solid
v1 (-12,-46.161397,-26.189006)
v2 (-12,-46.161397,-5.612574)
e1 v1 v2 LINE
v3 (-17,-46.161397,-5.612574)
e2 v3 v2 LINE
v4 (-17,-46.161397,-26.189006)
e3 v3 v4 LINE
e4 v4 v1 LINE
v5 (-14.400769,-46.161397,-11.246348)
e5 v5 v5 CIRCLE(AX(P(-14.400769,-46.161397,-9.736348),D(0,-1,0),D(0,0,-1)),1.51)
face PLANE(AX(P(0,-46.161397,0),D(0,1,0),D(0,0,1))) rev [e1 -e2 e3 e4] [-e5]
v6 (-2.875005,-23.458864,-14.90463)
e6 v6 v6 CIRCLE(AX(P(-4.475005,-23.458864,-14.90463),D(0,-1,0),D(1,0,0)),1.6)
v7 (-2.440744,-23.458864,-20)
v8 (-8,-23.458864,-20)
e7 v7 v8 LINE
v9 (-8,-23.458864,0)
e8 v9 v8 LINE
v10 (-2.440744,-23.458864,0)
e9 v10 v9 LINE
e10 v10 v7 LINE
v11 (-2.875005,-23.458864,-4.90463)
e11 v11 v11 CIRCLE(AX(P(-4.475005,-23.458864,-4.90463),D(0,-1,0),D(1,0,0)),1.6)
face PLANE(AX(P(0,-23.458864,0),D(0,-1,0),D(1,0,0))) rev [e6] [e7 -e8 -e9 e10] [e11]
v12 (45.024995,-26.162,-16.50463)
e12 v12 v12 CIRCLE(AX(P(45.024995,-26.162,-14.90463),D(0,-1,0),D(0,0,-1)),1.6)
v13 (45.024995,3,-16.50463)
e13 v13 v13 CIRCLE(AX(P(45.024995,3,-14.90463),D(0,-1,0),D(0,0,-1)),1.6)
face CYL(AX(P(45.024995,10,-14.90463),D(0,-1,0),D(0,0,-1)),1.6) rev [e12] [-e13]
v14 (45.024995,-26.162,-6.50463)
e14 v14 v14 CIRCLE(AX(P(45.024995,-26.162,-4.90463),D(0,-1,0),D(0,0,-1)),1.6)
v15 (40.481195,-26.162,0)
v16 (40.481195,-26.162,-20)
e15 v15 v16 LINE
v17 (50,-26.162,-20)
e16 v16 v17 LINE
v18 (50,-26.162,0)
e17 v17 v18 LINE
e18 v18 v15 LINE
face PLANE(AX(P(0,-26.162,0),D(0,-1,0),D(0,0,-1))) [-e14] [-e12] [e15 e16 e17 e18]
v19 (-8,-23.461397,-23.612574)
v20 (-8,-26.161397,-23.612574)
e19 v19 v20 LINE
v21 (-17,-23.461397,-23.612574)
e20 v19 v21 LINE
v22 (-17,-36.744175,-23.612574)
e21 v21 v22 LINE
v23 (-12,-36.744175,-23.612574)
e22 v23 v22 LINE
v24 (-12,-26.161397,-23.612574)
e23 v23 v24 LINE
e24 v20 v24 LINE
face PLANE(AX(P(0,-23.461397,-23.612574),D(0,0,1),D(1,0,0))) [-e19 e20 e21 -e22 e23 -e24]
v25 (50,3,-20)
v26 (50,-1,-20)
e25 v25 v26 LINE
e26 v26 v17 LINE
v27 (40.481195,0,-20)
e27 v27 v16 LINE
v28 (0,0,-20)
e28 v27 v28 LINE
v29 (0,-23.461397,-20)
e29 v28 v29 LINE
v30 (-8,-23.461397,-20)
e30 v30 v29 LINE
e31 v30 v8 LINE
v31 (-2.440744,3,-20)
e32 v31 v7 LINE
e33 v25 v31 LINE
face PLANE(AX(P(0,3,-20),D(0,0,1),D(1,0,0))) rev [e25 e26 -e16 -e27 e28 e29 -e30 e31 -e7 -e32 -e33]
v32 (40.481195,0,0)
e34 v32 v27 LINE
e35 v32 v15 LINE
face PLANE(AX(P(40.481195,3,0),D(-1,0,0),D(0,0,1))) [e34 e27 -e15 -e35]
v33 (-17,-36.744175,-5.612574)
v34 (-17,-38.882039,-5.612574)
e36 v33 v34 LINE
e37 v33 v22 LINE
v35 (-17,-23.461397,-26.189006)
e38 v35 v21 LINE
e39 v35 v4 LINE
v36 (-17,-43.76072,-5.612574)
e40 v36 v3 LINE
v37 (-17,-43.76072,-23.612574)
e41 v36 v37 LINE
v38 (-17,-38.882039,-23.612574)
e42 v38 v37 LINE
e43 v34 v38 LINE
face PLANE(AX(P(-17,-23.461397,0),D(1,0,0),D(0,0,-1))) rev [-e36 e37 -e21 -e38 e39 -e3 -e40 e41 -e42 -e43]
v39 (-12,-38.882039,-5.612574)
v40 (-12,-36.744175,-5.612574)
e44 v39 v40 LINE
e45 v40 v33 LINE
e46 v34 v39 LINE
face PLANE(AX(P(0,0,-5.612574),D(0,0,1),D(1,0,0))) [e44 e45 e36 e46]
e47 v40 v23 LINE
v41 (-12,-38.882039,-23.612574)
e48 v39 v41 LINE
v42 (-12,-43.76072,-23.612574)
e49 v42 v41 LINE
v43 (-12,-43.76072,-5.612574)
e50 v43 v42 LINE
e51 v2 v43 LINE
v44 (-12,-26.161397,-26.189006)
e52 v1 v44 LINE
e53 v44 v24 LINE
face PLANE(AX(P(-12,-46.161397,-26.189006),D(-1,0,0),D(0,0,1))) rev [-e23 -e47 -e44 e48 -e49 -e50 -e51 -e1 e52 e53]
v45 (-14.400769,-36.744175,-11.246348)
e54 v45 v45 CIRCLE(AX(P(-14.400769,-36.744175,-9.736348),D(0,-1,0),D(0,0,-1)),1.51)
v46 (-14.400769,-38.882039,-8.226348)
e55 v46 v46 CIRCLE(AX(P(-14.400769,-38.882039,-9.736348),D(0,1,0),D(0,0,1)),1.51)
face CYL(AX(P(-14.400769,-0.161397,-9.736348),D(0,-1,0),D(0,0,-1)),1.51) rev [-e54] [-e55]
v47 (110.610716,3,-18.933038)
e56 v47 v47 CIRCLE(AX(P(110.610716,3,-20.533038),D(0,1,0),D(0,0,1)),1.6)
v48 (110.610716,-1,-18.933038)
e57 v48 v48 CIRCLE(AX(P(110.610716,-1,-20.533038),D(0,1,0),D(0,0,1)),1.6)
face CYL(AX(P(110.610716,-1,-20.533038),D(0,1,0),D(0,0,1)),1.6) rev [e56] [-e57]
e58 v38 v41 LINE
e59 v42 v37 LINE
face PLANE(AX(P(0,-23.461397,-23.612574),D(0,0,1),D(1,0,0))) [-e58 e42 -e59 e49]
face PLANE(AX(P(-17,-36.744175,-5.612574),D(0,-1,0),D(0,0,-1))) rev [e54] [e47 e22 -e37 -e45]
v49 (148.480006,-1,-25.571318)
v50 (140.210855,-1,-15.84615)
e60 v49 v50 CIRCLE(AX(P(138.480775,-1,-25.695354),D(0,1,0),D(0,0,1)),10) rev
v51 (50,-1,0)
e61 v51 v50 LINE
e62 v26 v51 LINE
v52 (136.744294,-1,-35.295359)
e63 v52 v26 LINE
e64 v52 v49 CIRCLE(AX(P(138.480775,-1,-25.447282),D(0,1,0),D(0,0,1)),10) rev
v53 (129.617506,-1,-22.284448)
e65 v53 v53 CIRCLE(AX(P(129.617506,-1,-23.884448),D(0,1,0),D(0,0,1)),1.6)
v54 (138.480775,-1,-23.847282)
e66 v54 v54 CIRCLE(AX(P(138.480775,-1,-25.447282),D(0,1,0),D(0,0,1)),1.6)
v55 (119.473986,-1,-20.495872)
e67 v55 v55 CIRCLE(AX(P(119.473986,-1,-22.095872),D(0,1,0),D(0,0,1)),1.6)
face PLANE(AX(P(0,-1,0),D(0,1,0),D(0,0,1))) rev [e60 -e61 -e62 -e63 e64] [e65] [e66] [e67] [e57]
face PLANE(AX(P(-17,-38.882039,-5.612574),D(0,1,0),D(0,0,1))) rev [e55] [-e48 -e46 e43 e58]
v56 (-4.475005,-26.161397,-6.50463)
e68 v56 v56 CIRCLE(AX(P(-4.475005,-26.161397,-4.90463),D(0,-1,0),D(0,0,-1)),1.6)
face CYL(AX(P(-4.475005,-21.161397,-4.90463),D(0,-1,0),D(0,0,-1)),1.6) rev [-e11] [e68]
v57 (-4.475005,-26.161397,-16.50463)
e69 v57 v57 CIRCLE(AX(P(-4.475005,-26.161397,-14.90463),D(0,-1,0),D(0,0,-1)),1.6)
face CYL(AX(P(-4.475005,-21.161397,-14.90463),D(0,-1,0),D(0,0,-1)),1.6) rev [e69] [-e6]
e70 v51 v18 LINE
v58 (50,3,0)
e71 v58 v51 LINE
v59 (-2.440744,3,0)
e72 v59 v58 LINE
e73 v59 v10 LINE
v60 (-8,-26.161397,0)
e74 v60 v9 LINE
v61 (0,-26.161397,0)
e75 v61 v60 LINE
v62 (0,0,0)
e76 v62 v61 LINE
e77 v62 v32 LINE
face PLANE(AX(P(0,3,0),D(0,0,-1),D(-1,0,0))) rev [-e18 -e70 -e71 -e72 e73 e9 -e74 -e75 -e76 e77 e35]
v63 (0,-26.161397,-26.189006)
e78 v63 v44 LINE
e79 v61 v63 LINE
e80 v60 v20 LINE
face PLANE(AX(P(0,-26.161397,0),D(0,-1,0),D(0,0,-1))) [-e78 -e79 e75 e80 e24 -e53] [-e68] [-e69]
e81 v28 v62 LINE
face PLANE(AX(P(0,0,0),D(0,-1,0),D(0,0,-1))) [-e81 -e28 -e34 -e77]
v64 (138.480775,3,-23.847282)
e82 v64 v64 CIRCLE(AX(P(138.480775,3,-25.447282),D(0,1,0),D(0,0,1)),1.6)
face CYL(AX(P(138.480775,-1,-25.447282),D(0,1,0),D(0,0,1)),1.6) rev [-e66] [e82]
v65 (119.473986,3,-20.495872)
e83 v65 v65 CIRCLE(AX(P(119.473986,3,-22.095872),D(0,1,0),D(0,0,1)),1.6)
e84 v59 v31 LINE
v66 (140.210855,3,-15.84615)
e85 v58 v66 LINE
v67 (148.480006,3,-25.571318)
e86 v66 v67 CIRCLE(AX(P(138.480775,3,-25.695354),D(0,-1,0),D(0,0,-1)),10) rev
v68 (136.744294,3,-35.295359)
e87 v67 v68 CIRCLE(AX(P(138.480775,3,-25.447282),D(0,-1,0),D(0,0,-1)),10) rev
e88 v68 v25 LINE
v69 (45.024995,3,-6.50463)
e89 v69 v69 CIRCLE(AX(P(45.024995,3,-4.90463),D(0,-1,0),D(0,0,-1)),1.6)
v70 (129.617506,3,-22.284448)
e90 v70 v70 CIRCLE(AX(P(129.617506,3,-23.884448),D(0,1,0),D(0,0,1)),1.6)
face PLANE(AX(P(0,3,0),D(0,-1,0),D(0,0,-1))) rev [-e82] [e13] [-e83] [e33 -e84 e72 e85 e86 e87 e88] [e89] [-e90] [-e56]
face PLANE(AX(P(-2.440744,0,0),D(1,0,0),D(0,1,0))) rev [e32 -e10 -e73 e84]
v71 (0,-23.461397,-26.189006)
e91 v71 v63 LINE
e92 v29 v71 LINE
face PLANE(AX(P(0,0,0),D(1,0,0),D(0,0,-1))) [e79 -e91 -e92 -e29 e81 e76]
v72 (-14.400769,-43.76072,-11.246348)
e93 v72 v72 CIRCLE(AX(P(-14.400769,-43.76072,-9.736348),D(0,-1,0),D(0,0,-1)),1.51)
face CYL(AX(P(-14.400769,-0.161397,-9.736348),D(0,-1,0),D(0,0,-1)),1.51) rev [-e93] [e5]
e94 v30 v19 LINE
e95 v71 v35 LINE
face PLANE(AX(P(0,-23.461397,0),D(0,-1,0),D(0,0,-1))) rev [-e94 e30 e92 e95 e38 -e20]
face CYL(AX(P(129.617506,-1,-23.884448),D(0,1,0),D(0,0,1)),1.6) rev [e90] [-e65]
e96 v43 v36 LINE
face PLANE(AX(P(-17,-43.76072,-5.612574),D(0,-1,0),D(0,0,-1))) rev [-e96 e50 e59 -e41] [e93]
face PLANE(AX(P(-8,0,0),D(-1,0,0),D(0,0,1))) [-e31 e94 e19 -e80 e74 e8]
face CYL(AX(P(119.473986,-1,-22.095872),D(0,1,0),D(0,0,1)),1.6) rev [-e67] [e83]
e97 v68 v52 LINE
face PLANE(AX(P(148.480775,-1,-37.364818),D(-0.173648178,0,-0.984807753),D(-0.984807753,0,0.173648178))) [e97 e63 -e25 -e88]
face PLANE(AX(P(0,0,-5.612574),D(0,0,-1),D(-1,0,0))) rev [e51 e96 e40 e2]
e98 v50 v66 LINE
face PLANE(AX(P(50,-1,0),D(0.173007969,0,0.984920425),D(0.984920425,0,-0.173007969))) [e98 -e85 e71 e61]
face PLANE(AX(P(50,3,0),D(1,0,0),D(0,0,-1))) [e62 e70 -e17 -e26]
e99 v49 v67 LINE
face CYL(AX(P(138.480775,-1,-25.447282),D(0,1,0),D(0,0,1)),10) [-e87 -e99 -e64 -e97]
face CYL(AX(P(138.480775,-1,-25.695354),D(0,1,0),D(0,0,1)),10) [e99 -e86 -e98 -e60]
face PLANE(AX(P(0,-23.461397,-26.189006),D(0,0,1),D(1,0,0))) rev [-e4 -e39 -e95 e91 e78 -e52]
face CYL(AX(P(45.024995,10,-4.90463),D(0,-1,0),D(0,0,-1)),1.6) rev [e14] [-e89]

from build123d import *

# Parameters (mm, degrees)
SKETCH1_W                = 135
SKETCH1_H                = 20
BOSS_EXTRUDE1_DEPTH      = 3
BOSS_EXTRUDE2_START      = -20
BOSS_EXTRUDE2_DEPTH      = 20
SKETCH5_R                = 1.6
CUT_EXTRUDE1_DEPTH       = 5
BOSS_EXTRUDE3_DEPTH      = 2.7
SKETCH7_W                = 5
SKETCH7_H                = 2.576431393
BOSS_EXTRUDE4_DEPTH      = 20
SKETCH9_W                = 5
SKETCH9_H                = 2.400677448
SKETCH9_H_2              = 2.137863312
BOSS_EXTRUDE5_DEPTH      = 18
SKETCH10_R               = 1.51
CUT_EXTRUDE2_DEPTH       = 46
SKETCH11_W               = 87
SKETCH11_H               = 20
CUT_EXTRUDE3_DEPTH       = 7
BOSS_EXTRUDE7_DEPTH      = 26.162
BOSS_EXTRUDE7_DEPTH_BACK = 3
SKETCH12_W               = 9.518804698
SKETCH12_H               = 20
SKETCH13_R               = 1.6
CUT_EXTRUDE4_DEPTH       = 36.162
BOSS_EXTRUDE8_DEPTH      = 4
FILLET1_R                = 10
SKETCH18_R               = 1.6
CUT_EXTRUDE6_DEPTH       = 4


# Read off the part's stored shape, not the designer's step: Boss-Extrude2
with BuildPart() as part:
    # Sketch1 → Boss-Extrude1 (new body)
    with BuildSketch(Plane(origin=(0, 0, 0), x_dir=(1, 0, 0), z_dir=(0, 1, 0))):
        with Locations((67.5, 10)):
            Rectangle(SKETCH1_W, SKETCH1_H)
    extrude(amount=BOSS_EXTRUDE1_DEPTH)


with BuildPart() as body_2:
    # Boss-Extrude2 outline → Boss-Extrude2 (new body)
    with BuildSketch(Plane(origin=(0, 0, -20), x_dir=(-1, 0, 0), z_dir=(0, 0, -1)).offset(BOSS_EXTRUDE2_START)):
        Polygon((-135, 0), (0, 0), (0, -26.161397266), (8, -26.161397266), (8, -23.458863774), (2.440744198, -23.458863774), (2.440744198, 3), (-135, 3), align=None)
    extrude(amount=BOSS_EXTRUDE2_DEPTH)

    # Sketch5 → Cut-Extrude1 (cut)
    with BuildSketch(Plane(origin=(0, -26.161397266, 0), x_dir=(-1, 0, 0), z_dir=(0, -1, 0))):
        with Locations(Location((4.475005096, 14.904630263, 0), (0, 0, 90))):
            Circle(SKETCH5_R)
        with Locations(Location((4.475005096, 4.904630263, 0), (0, 0, 90))):
            Circle(SKETCH5_R)
    extrude(amount=-CUT_EXTRUDE1_DEPTH, mode=Mode.SUBTRACT)

    # Sketch6 → Boss-Extrude3 (add)
    with BuildSketch(Plane(origin=(0, -26.161397266, 0), x_dir=(-1, 0, 0), z_dir=(0, -1, 0))):
        Polygon((0, 26.189005721), (0, 20), (8, 20), (8, 23.612574328), (17, 23.612574328), (17, 26.189005721), align=None)
    extrude(amount=-BOSS_EXTRUDE3_DEPTH)

    # Sketch7 → Boss-Extrude4 (add)
    with BuildSketch(Plane.XZ.offset(26.161397266)):
        with Locations((-14.5, -24.900790025)):
            Rectangle(SKETCH7_W, SKETCH7_H)
    extrude(amount=BOSS_EXTRUDE4_DEPTH)

    # Sketch9 → Boss-Extrude5 (add)
    with BuildSketch(Plane.XY.offset(-23.612574328)):
        with Locations((-14.5, -44.961058542)):
            Rectangle(SKETCH9_W, SKETCH9_H)
        with Locations((-14.5, -37.813107102)):
            Rectangle(SKETCH9_W, SKETCH9_H_2)
    extrude(amount=BOSS_EXTRUDE5_DEPTH)

    # Sketch10 → Cut-Extrude2 (cut)
    with BuildSketch(Plane(origin=(0, -46.161397266, 0), x_dir=(-1, 0, 0), z_dir=(0, -1, 0))):
        with Locations(Location((14.400768804, 9.736347936, 0), (0, 0, 90))):
            Circle(SKETCH10_R)
    extrude(amount=-CUT_EXTRUDE2_DEPTH, mode=Mode.SUBTRACT)


with BuildPart() as cut_extrude3_tool:
    # Sketch11 → Cut-Extrude3 (new body)
    with BuildSketch(Plane.XZ):
        with Locations((91.5, -10)):
            Rectangle(SKETCH11_W, SKETCH11_H)
    extrude(amount=-CUT_EXTRUDE3_DEPTH)


with BuildPart() as part_1:
    add(part.part)

    # Cut-Extrude3: cut by cut_extrude3_tool
    add(cut_extrude3_tool.part, mode=Mode.SUBTRACT)



with BuildPart() as body_2_1:
    add(body_2.part)

    # Cut-Extrude3: cut by cut_extrude3_tool
    add(cut_extrude3_tool.part, mode=Mode.SUBTRACT)


with BuildPart() as part_2:
    add(part_1.part)

    add(body_2_1.part)  # Boss-Extrude7 merges body 2
    # Sketch12 → Boss-Extrude7 (add, two sides: drawn at the far end of the back side and taken through both)
    with BuildSketch(Plane(origin=(0, 0, 0), x_dir=(-1, 0, 0), z_dir=(0, -1, 0)).offset(-BOSS_EXTRUDE7_DEPTH_BACK)):
        with Locations((-45.240597651, 10)):
            Rectangle(SKETCH12_W, SKETCH12_H)
    extrude(amount=BOSS_EXTRUDE7_DEPTH + BOSS_EXTRUDE7_DEPTH_BACK)

    # Sketch13 → Cut-Extrude4 (cut)
    with BuildSketch(Plane(origin=(0, -26.162, 0), x_dir=(-1, 0, 0), z_dir=(0, -1, 0))):
        with Locations(Location((-45.024994904, 4.904630263, 0), (0, 0, 90))):
            Circle(SKETCH13_R)
        with Locations(Location((-45.024994904, 14.904630263, 0), (0, 0, 90))):
            Circle(SKETCH13_R)
    extrude(amount=-CUT_EXTRUDE4_DEPTH, mode=Mode.SUBTRACT)

    # Sketch14 → Boss-Extrude8 (add)
    with BuildSketch(Plane(origin=(0, 3, 0), x_dir=(1, 0, 0), z_dir=(0, 1, 0))):
        Polygon((50, 20), (50, 0), (148.480775301, 17.298817767), (148.480775301, 37.364817767), align=None)
    extrude(amount=-BOSS_EXTRUDE8_DEPTH)

    # Fillet1
    # the kernel refuses this fillet: 10 mm, written as the material it takes off along each edge
    with BuildSketch(Plane(origin=(148.480775301, 23.991341286, -17.298817767), x_dir=(-0.9849204245014849, 0, 0.1730079691800782), z_dir=(0, -1, 0))) as fillet1_piece_1:
        with BuildLine():
            CenterArc((FILLET1_R * 0.83965365145, FILLET1_R), FILLET1_R, 189.96275502, 80.03724498)
            Line((-FILLET1_R * 0.145266773052, FILLET1_R * 0.82699203082), (0, 0))
            Line((0, 0), (FILLET1_R * 0.83965365145, 0))
        make_face()
    extrude(amount=45.982682572, mode=Mode.SUBTRACT)
    with BuildSketch(Plane(origin=(148.480775301, 32.793839815, -37.364817767), x_dir=(0, 0, 1), z_dir=(0, -1, 0))) as fillet1_piece_2:
        with BuildLine():
            CenterArc((FILLET1_R * 1.19175359259, FILLET1_R), FILLET1_R, 170, 100)
            Line((FILLET1_R * 0.206945839582, FILLET1_R * 1.17364817767), (0, 0))
            Line((0, 0), (FILLET1_R * 1.19175359259, 0))
        make_face()
    extrude(amount=63.58767963, mode=Mode.SUBTRACT)

    # Sketch18 → Cut-Extrude6 (cut)
    with BuildSketch(Plane(origin=(0, 3, 0), x_dir=(1, 0, 0), z_dir=(0, 1, 0))):
        with Locations(Location((138.480775301, 25.447281841, 0), (0, 0, 270))):
            Circle(SKETCH18_R)
        with Locations(Location((119.473985668, 22.095872012, 0), (0, 0, 270))):
            Circle(SKETCH18_R)
        with Locations(Location((110.610715891, 20.533038413, 0), (0, 0, 270))):
            Circle(SKETCH18_R)
        with Locations(Location((129.617505524, 23.884448242, 0), (0, 0, 270))):
            Circle(SKETCH18_R)
    extrude(amount=-CUT_EXTRUDE6_DEPTH, mode=Mode.SUBTRACT)


solid = part_2.part
